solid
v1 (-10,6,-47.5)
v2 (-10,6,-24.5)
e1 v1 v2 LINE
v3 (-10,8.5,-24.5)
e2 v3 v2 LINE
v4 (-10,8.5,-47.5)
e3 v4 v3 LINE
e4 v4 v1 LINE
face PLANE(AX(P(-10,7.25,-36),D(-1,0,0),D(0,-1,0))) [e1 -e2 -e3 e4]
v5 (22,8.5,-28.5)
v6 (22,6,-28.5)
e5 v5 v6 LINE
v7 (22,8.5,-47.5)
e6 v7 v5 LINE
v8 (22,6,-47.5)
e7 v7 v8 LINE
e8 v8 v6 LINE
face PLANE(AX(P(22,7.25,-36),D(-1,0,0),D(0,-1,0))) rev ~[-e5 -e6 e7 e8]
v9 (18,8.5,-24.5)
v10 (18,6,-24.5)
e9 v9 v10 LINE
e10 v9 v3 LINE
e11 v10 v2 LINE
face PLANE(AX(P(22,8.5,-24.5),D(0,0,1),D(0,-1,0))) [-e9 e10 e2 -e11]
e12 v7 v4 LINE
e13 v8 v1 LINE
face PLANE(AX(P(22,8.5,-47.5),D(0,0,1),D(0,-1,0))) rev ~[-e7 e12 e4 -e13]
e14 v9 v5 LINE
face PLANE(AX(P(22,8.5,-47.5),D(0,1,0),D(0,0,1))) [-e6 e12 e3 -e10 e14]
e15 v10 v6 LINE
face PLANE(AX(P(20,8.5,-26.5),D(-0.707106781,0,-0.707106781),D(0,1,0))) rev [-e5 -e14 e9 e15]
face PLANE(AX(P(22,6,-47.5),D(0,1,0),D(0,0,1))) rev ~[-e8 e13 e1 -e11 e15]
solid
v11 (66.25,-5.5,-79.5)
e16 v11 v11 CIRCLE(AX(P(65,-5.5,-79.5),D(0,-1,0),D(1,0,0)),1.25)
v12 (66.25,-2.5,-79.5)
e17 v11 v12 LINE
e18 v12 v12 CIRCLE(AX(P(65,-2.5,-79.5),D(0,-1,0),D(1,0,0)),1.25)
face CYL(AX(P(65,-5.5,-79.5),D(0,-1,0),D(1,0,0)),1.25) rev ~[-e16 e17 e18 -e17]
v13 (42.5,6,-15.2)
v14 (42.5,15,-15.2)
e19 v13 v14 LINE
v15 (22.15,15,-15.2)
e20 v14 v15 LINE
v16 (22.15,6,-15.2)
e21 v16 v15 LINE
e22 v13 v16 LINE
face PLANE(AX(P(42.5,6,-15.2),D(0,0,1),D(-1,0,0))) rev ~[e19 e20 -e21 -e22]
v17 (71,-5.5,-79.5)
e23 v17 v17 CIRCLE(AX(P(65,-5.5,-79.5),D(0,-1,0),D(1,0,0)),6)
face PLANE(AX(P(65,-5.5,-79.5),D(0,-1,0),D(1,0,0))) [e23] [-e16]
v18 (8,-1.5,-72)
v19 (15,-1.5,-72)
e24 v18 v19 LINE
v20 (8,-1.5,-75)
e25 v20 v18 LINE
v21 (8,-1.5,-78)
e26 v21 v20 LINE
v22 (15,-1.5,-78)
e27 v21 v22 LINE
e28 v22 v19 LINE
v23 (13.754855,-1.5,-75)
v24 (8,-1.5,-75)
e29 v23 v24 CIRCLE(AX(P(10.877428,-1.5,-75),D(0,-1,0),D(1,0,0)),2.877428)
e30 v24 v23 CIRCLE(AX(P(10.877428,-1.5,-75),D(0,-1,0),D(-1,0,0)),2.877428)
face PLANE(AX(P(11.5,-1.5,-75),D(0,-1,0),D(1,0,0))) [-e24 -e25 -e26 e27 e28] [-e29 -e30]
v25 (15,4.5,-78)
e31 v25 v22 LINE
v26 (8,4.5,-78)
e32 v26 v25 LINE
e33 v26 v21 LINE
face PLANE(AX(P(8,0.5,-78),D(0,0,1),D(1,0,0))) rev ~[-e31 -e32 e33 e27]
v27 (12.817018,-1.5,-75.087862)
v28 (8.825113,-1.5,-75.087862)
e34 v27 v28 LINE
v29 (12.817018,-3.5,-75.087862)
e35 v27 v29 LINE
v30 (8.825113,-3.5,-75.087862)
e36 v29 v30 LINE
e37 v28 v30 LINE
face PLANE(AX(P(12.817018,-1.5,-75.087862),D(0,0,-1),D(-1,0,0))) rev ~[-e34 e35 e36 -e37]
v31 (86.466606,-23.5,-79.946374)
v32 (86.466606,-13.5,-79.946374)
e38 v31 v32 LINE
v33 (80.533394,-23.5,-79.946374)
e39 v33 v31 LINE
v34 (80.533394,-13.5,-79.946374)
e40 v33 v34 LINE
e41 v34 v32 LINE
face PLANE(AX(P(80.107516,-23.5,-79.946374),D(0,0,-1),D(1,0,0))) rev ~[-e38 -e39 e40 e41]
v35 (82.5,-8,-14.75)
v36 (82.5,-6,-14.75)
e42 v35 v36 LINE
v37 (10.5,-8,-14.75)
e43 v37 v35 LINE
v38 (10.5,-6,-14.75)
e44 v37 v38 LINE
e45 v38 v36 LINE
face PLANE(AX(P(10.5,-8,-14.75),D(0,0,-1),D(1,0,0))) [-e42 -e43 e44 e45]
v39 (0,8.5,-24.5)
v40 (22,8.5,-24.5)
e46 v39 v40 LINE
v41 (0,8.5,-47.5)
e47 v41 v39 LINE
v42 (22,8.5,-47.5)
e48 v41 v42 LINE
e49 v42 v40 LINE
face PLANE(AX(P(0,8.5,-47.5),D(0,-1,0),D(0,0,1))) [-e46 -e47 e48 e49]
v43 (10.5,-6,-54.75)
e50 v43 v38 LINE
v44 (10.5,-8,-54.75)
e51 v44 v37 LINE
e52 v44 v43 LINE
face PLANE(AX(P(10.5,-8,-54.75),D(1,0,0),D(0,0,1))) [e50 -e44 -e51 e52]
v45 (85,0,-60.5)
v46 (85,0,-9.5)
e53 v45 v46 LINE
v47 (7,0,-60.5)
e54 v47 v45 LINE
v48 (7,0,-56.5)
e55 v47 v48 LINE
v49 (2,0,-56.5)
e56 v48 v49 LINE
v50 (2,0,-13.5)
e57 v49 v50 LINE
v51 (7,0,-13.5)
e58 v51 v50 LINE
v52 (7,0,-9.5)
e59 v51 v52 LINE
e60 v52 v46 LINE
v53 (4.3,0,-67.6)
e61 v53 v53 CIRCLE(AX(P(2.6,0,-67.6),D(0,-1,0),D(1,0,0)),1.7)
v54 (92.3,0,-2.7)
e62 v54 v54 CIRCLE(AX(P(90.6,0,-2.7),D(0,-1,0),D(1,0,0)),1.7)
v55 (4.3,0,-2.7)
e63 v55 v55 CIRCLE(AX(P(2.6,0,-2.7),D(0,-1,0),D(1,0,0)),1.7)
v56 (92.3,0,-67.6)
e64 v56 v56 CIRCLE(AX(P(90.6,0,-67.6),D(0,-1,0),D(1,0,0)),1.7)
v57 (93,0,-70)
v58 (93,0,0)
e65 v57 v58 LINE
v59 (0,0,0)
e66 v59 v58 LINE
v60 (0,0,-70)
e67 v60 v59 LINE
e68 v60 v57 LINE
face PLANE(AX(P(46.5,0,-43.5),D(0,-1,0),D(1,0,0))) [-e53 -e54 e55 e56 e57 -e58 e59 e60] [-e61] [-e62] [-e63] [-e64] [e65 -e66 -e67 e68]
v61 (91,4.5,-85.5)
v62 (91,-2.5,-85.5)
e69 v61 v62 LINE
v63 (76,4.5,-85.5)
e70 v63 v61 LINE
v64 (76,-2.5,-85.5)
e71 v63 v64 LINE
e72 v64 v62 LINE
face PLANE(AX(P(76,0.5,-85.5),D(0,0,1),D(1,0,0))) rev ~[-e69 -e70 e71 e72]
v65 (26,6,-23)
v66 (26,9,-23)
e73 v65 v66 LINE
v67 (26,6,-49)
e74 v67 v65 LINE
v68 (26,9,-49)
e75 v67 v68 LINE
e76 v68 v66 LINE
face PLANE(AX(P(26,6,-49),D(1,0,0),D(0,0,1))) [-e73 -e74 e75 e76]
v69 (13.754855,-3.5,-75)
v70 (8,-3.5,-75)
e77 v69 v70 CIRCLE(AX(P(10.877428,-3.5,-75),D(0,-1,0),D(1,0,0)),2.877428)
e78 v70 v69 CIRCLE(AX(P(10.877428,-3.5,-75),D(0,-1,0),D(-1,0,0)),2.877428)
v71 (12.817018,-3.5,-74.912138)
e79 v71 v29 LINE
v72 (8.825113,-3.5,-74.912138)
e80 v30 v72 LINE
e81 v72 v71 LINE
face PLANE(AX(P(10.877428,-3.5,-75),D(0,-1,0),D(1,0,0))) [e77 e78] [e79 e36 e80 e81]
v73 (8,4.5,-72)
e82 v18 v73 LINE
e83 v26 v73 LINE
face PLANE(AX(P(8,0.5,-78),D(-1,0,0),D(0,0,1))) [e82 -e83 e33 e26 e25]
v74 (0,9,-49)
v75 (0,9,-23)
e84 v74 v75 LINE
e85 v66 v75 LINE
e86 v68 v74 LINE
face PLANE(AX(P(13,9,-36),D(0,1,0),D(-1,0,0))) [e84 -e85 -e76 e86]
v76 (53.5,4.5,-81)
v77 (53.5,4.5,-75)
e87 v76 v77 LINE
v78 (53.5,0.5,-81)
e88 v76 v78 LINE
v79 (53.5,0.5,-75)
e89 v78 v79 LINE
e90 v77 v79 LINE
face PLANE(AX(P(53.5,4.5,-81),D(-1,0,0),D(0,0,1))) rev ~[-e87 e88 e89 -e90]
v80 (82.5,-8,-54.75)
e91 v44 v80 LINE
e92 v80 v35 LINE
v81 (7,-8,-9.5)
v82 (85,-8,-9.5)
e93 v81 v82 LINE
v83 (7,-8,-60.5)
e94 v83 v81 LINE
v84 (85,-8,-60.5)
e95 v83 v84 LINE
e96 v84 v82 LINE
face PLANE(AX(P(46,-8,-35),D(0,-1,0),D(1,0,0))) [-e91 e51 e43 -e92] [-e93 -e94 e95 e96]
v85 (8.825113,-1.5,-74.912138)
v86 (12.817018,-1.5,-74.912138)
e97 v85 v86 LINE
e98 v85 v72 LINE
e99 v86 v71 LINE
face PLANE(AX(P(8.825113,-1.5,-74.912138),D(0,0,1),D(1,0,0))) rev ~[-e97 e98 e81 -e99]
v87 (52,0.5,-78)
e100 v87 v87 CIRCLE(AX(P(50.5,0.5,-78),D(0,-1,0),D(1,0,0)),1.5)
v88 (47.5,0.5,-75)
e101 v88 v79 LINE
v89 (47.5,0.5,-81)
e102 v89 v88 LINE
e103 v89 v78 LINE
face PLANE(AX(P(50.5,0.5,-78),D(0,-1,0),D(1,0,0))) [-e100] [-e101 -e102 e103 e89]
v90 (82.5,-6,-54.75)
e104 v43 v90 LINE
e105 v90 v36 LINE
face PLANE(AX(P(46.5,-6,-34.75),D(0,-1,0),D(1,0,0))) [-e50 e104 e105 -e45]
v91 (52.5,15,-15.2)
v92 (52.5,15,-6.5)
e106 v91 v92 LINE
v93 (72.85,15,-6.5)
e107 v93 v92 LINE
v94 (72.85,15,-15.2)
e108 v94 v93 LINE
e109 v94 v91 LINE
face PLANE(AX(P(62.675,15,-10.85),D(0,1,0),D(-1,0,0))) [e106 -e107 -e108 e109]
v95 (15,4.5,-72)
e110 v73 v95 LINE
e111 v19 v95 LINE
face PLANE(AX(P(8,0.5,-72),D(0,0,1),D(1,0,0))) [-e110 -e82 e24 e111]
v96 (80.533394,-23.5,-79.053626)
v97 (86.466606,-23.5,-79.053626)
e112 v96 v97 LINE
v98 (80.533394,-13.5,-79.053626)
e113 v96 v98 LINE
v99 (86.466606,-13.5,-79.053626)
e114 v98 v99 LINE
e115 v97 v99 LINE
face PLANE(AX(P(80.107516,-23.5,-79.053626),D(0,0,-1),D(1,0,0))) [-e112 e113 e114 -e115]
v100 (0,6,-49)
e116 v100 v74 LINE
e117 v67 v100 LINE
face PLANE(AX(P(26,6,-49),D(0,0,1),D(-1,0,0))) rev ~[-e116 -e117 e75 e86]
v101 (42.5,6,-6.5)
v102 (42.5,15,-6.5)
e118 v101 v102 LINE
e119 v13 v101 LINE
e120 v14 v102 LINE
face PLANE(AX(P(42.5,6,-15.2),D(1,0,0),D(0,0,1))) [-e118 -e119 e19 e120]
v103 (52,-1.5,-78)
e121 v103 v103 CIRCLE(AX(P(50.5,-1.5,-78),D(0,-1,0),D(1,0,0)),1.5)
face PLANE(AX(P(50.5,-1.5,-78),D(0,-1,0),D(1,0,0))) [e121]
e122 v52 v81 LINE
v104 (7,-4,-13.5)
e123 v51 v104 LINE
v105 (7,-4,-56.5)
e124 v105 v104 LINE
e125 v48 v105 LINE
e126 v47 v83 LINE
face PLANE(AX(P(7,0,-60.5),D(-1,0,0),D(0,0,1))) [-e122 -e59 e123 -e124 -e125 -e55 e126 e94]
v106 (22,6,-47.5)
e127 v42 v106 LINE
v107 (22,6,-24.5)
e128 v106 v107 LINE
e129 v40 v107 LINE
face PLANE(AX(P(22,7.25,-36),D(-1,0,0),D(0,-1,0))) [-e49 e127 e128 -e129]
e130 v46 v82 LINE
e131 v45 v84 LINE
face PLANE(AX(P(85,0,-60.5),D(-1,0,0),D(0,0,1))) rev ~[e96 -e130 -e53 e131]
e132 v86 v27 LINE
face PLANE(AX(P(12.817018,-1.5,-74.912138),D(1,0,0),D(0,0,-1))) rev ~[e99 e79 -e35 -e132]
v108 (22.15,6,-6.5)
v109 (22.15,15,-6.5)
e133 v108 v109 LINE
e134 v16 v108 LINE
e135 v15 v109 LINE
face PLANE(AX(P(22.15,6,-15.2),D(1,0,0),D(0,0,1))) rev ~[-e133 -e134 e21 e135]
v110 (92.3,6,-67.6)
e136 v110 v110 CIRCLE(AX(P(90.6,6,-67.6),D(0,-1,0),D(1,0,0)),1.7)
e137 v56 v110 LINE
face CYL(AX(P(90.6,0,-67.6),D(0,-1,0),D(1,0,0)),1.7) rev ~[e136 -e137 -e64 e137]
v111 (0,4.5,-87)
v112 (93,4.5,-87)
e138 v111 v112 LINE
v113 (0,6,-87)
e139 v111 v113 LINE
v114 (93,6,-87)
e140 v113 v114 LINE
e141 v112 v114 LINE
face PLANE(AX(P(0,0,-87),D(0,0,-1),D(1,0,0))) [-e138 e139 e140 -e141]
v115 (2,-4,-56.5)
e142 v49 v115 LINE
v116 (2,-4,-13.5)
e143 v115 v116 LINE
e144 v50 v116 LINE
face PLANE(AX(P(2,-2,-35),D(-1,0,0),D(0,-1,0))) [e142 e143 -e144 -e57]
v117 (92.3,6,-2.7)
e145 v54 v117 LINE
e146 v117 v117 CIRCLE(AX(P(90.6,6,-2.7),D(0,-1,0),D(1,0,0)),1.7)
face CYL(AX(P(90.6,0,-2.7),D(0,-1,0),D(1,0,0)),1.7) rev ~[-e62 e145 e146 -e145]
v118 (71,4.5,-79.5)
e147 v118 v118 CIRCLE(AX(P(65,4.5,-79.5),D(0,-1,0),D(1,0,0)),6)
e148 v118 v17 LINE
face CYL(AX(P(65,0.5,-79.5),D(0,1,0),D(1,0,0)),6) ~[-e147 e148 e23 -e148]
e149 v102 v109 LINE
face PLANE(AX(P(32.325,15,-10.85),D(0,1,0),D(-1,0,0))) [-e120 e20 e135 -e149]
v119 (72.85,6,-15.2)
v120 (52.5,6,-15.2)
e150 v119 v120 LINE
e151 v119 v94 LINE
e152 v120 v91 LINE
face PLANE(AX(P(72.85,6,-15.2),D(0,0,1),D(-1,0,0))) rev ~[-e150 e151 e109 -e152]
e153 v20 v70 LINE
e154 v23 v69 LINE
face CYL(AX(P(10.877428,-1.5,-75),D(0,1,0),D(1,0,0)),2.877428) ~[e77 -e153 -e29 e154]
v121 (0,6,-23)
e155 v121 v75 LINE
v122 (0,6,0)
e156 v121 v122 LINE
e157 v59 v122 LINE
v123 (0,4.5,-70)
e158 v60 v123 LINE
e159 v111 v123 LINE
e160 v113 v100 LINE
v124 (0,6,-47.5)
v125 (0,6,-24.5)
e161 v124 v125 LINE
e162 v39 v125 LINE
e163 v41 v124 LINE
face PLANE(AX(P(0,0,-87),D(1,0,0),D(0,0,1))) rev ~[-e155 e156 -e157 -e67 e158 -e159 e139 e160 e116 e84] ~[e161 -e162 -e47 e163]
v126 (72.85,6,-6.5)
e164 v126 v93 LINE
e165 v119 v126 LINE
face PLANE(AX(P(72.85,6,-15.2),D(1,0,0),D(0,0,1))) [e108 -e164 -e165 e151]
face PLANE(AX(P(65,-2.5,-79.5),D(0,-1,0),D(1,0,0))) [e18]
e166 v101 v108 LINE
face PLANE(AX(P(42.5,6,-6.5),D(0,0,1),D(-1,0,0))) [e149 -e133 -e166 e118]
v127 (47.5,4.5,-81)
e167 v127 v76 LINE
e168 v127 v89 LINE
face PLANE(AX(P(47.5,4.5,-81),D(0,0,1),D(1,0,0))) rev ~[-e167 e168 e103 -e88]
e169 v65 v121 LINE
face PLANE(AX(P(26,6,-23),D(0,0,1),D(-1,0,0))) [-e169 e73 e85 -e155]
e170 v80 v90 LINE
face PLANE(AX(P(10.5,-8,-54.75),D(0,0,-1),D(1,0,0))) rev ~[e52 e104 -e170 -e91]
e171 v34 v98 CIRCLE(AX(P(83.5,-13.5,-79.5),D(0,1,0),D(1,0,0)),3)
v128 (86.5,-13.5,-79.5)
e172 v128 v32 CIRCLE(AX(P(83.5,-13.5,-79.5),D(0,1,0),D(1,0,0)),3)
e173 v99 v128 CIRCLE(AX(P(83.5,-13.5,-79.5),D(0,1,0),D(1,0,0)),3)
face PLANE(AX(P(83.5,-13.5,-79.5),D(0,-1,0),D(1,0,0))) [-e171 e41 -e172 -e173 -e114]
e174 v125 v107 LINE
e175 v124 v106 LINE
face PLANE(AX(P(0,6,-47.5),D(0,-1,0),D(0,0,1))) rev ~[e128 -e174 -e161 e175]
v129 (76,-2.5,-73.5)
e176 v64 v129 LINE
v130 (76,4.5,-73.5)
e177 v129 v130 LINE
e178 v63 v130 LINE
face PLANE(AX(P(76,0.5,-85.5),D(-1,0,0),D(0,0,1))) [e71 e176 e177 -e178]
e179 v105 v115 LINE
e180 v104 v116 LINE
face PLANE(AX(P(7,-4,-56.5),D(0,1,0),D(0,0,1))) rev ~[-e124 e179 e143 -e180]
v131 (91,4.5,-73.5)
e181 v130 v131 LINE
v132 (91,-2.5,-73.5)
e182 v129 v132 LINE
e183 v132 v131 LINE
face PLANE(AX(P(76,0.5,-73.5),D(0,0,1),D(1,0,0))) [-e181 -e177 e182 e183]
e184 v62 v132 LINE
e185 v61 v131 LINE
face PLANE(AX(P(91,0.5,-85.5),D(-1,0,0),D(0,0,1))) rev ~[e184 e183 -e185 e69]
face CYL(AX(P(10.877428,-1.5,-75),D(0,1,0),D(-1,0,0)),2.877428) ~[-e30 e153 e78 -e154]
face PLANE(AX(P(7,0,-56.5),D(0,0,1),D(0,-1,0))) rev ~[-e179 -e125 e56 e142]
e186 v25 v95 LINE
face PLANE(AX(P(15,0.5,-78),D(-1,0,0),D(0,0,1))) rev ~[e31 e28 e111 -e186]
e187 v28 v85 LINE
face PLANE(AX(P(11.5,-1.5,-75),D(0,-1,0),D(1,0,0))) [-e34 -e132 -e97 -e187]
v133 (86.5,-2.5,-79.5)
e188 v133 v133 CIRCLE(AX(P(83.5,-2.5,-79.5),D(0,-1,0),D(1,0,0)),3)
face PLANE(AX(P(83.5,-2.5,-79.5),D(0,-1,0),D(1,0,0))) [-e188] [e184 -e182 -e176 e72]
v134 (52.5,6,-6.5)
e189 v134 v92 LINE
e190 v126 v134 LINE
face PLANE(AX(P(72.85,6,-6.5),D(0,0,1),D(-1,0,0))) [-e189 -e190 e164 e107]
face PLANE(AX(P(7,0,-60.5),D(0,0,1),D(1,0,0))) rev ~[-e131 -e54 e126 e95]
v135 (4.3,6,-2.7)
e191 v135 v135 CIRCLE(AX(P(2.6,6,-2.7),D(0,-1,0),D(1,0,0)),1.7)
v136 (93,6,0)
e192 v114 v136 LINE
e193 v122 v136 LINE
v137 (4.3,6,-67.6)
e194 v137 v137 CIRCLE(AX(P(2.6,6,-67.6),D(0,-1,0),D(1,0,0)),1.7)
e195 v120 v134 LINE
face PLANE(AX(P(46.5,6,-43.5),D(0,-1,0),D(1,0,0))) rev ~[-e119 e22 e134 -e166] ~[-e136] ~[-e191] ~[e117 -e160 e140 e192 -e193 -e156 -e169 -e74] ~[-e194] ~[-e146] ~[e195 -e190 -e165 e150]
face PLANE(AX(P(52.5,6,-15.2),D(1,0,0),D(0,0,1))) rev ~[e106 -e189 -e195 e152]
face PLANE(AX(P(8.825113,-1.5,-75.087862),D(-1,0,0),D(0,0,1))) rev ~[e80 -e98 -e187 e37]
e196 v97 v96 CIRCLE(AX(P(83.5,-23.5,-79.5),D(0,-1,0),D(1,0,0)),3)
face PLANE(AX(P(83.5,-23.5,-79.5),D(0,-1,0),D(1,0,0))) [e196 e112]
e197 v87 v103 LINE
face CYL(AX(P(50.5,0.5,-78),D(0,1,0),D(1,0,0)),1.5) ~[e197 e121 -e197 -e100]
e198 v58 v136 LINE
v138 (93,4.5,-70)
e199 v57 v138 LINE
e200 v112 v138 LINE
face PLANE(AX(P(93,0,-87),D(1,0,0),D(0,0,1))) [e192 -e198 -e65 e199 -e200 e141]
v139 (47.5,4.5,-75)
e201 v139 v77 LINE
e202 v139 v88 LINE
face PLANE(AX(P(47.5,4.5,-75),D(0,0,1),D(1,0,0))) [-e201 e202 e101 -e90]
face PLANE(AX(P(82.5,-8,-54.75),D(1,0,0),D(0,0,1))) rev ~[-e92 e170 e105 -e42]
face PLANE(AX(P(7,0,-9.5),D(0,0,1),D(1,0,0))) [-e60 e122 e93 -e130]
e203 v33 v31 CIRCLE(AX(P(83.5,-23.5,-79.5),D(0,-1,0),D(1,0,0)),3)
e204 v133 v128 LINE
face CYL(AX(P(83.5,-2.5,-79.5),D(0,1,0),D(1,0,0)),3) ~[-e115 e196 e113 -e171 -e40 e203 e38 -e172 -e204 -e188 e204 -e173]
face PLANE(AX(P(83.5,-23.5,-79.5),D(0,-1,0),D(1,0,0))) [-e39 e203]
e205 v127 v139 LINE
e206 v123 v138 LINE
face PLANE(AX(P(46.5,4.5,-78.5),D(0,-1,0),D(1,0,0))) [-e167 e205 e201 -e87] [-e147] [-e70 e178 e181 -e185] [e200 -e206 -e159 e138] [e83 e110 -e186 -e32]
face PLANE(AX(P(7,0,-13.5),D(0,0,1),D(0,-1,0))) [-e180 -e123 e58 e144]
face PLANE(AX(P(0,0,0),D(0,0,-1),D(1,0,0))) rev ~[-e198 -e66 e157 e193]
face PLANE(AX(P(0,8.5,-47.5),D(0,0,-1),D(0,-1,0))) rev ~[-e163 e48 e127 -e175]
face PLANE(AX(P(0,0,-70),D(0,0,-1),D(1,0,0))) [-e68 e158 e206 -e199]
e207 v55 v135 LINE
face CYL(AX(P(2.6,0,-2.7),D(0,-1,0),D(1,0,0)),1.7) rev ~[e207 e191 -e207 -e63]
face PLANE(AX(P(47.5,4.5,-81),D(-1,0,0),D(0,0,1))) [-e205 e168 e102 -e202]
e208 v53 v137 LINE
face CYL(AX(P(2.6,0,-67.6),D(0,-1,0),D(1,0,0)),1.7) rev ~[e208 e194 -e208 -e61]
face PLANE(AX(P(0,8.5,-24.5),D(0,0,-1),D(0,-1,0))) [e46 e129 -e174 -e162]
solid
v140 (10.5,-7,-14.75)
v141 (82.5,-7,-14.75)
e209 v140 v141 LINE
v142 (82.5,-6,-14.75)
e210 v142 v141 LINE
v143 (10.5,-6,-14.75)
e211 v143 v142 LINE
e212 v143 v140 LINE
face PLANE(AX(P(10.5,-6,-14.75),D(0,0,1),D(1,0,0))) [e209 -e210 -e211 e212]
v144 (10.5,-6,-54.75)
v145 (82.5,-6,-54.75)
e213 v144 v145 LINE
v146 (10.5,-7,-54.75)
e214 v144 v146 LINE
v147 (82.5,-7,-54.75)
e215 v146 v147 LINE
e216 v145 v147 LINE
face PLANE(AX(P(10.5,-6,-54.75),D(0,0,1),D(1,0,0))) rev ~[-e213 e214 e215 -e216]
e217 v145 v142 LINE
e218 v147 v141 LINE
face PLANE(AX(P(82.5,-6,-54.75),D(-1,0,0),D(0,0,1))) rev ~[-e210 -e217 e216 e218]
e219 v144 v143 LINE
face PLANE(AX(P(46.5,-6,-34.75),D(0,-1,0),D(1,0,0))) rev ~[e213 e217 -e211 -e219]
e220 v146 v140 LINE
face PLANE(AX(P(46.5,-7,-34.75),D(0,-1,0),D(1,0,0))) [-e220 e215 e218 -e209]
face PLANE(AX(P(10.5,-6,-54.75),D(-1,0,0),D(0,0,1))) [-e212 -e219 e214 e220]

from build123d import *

# Parameters (mm, degrees)
F0_W      = 93
F0_H      = 87
F1_DEPTH  = 6
F2_W      = 78
F2_H      = 51
F3_DEPTH  = 8
F4_W      = 72
F4_H      = 40
F5_DEPTH  = 2
F6_R      = 1.7
F7_DEPTH  = 25
F8_W      = 4
F8_H      = 43
F9_DEPTH  = 5
F10_W     = 93
F10_H     = 17
F11_DEPTH = 4.5
F12_W     = 15
F12_H     = 12
F12_W_2   = 6
F12_H_2   = 6
F12_W_3   = 7
F12_R     = 6
F13_DEPTH = 4
F14_DEPTH = 3
F15_DEPTH = 2
F16_DEPTH = 6
F18_DEPTH = 2
F19_R     = 1.5
F20_DEPTH = 2
F21_R     = 1.25
F22_DEPTH = 3
F23_R     = 3
F24_DEPTH = 21
F25_W     = 6.7849671841
F25_H     = 0.8927487135
F26_DEPTH = 10
F27_W     = 26
F27_H     = 26
F28_DEPTH = 3
F29_W     = 2.5
F29_H     = 23
F30_DEPTH = 22
F31_DEPTH = 32
F32_SIZE  = 4
F33_W     = 20.35
F33_H     = 8.7
F34_DEPTH = 9
F35_DEPTH = 1


with BuildPart() as f1:
    # F0 (on Front) → F1 (new body)
    with BuildSketch(Plane.XZ):
        with Locations((46.5, -43.5)):
            Rectangle(F0_W, F0_H)
    extrude(amount=-F1_DEPTH)

    # F2 (on face) → F3 (join)
    with BuildSketch(Plane.XZ):
        with Locations((46, -35)):
            Rectangle(F2_W, F2_H)
    extrude(amount=F3_DEPTH)

    # F4 (on face) → F5 (cut)
    with BuildSketch(Plane.XZ.offset(8)):
        with Locations((46.5, -34.75)):
            Rectangle(F4_W, F4_H)
    extrude(amount=-F5_DEPTH, mode=Mode.SUBTRACT)

    # F6 (on face) → F7 (cut)
    with BuildSketch(Plane.XZ):
        with Locations((2.6, -2.7)):
            Circle(F6_R)
        with Locations((90.6, -2.7)):
            Circle(F6_R)
        with Locations((90.6, -67.6)):
            Circle(F6_R)
        with Locations((2.6, -67.6)):
            Circle(F6_R)
    extrude(amount=-F7_DEPTH, mode=Mode.SUBTRACT)

    # F8 (on face) → F9 (join)
    with BuildSketch(Plane(origin=(7, 0, 0), x_dir=(0, -1, 0), z_dir=(-1, 0, 0))):
        with Locations((2, -35)):
            Rectangle(F8_W, F8_H)
    extrude(amount=F9_DEPTH)

    # F10 (on face) → F11 (cut)
    with BuildSketch(Plane.XZ):
        with Locations((46.5, -78.5)):
            Rectangle(F10_W, F10_H)
    extrude(amount=-F11_DEPTH, mode=Mode.SUBTRACT)

    # F12 (on face) → F13 (join)
    with BuildSketch(Plane.XZ.offset(-4.5)):
        with Locations((83.5, -79.5)):
            Rectangle(F12_W, F12_H)
        with Locations((50.5, -78)):
            Rectangle(F12_W_2, F12_H_2)
        with Locations((11.5, -75)):
            Rectangle(F12_W_3, F12_H_2)
        with Locations((65, -79.5)):
            Circle(F12_R)
    extrude(amount=F13_DEPTH)

    # F14 (add): a face of the model
    f14_faces = [f1.faces().sort_by_distance(p)[0] for p in [
        (83.5, 0.5, -79.5),
    ]]
    extrude(f14_faces, amount=F14_DEPTH)

    # F15 (add): a face of the model
    f15_faces = [f1.faces().sort_by_distance(p)[0] for p in [
        (11.5, 0.5, -75),
    ]]
    extrude(f15_faces, amount=F15_DEPTH)

    # F16 (add): a face of the model
    f16_faces = [f1.faces().sort_by_distance(p)[0] for p in [
        (65, 0.5, -79.5),
    ]]
    extrude(f16_faces, amount=F16_DEPTH)

    # F17 (on face) → F18 (join)
    with BuildSketch(Plane.XZ.offset(1.5)):
        with BuildLine():
            ThreePointArc((8, -75), (10.8774275169, -77.8774275169), (13.7548550337, -75))
            ThreePointArc((13.7548550337, -75), (10.8774275169, -72.1225724831), (8, -75))
        make_face()
        Polygon((8.8251130655, -75), (8.8251130655, -74.9121382833), (12.8170177341, -74.9121382833), (12.8170177341, -75), (12.8170177341, -75.0878617167), (8.8251130655, -75.0878617167), align=None, mode=Mode.SUBTRACT)
    extrude(amount=F18_DEPTH)

    # F19 (on face) → F20 (join)
    with BuildSketch(Plane.XZ.offset(-0.5)):
        with Locations((50.5, -78)):
            Circle(F19_R)
    extrude(amount=F20_DEPTH)

    # F21 (on face) → F22 (cut)
    with BuildSketch(Plane.XZ.offset(5.5)):
        with Locations((65, -79.5)):
            Circle(F21_R)
    extrude(amount=-F22_DEPTH, mode=Mode.SUBTRACT)

    # F23 (on face) → F24 (join)
    with BuildSketch(Plane.XZ.offset(2.5)):
        with Locations((83.5, -79.5)):
            Circle(F23_R)
    extrude(amount=F24_DEPTH)

    # F25 (on face) → F26 (cut)
    with BuildSketch(Plane.XZ.offset(23.5)):
        with Locations((83.5, -79.5)):
            Rectangle(F25_W, F25_H)
    extrude(amount=-F26_DEPTH, mode=Mode.SUBTRACT)

    # F27 (on face) → F28 (join)
    with BuildSketch(Plane(origin=(0, 6, 0), x_dir=(-1, 0, 0), z_dir=(0, 1, 0))):
        with Locations((-13, -36)):
            Rectangle(F27_W, F27_H)
    extrude(amount=F28_DEPTH)

    # F29 (on face) → F30 (cut)
    with BuildSketch(Plane(origin=(0, 0, 0), x_dir=(0, -1, 0), z_dir=(-1, 0, 0))):
        with Locations((-7.25, -36)):
            Rectangle(F29_W, F29_H)
    extrude(amount=-F30_DEPTH, mode=Mode.SUBTRACT)


with BuildPart() as f31:
    # F31 (new): a face of the model
    f31_faces = [f1.part.faces().sort_by_distance(p)[0] for p in [
        (22, 7.25, -36),
    ]]
    extrude(f31_faces, amount=F31_DEPTH)

    # F32
    f32_edges = [f31.edges().sort_by_distance(p)[0] for p in [
        (22, 7.25, -24.5),
    ]]
    chamfer(f32_edges, length=F32_SIZE)


with BuildPart() as f1_1:
    add(f1.part)

    # F33 (on face) → F34 (join)
    with BuildSketch(Plane(origin=(0, 6, 0), x_dir=(-1, 0, 0), z_dir=(0, 1, 0))):
        with Locations((-62.675, -10.85)):
            Rectangle(F33_W, F33_H)
        with Locations((-32.325, -10.85)):
            Rectangle(F33_W, F33_H)
    extrude(amount=F34_DEPTH)


with BuildPart() as f35:
    # F35 (new): a face of the model
    f35_faces = [f1_1.part.faces().sort_by_distance(p)[0] for p in [
        (46.5, -6, -34.75),
    ]]
    extrude(f35_faces, amount=F35_DEPTH)


solid = Compound([f31.part, f1_1.part, f35.part])
